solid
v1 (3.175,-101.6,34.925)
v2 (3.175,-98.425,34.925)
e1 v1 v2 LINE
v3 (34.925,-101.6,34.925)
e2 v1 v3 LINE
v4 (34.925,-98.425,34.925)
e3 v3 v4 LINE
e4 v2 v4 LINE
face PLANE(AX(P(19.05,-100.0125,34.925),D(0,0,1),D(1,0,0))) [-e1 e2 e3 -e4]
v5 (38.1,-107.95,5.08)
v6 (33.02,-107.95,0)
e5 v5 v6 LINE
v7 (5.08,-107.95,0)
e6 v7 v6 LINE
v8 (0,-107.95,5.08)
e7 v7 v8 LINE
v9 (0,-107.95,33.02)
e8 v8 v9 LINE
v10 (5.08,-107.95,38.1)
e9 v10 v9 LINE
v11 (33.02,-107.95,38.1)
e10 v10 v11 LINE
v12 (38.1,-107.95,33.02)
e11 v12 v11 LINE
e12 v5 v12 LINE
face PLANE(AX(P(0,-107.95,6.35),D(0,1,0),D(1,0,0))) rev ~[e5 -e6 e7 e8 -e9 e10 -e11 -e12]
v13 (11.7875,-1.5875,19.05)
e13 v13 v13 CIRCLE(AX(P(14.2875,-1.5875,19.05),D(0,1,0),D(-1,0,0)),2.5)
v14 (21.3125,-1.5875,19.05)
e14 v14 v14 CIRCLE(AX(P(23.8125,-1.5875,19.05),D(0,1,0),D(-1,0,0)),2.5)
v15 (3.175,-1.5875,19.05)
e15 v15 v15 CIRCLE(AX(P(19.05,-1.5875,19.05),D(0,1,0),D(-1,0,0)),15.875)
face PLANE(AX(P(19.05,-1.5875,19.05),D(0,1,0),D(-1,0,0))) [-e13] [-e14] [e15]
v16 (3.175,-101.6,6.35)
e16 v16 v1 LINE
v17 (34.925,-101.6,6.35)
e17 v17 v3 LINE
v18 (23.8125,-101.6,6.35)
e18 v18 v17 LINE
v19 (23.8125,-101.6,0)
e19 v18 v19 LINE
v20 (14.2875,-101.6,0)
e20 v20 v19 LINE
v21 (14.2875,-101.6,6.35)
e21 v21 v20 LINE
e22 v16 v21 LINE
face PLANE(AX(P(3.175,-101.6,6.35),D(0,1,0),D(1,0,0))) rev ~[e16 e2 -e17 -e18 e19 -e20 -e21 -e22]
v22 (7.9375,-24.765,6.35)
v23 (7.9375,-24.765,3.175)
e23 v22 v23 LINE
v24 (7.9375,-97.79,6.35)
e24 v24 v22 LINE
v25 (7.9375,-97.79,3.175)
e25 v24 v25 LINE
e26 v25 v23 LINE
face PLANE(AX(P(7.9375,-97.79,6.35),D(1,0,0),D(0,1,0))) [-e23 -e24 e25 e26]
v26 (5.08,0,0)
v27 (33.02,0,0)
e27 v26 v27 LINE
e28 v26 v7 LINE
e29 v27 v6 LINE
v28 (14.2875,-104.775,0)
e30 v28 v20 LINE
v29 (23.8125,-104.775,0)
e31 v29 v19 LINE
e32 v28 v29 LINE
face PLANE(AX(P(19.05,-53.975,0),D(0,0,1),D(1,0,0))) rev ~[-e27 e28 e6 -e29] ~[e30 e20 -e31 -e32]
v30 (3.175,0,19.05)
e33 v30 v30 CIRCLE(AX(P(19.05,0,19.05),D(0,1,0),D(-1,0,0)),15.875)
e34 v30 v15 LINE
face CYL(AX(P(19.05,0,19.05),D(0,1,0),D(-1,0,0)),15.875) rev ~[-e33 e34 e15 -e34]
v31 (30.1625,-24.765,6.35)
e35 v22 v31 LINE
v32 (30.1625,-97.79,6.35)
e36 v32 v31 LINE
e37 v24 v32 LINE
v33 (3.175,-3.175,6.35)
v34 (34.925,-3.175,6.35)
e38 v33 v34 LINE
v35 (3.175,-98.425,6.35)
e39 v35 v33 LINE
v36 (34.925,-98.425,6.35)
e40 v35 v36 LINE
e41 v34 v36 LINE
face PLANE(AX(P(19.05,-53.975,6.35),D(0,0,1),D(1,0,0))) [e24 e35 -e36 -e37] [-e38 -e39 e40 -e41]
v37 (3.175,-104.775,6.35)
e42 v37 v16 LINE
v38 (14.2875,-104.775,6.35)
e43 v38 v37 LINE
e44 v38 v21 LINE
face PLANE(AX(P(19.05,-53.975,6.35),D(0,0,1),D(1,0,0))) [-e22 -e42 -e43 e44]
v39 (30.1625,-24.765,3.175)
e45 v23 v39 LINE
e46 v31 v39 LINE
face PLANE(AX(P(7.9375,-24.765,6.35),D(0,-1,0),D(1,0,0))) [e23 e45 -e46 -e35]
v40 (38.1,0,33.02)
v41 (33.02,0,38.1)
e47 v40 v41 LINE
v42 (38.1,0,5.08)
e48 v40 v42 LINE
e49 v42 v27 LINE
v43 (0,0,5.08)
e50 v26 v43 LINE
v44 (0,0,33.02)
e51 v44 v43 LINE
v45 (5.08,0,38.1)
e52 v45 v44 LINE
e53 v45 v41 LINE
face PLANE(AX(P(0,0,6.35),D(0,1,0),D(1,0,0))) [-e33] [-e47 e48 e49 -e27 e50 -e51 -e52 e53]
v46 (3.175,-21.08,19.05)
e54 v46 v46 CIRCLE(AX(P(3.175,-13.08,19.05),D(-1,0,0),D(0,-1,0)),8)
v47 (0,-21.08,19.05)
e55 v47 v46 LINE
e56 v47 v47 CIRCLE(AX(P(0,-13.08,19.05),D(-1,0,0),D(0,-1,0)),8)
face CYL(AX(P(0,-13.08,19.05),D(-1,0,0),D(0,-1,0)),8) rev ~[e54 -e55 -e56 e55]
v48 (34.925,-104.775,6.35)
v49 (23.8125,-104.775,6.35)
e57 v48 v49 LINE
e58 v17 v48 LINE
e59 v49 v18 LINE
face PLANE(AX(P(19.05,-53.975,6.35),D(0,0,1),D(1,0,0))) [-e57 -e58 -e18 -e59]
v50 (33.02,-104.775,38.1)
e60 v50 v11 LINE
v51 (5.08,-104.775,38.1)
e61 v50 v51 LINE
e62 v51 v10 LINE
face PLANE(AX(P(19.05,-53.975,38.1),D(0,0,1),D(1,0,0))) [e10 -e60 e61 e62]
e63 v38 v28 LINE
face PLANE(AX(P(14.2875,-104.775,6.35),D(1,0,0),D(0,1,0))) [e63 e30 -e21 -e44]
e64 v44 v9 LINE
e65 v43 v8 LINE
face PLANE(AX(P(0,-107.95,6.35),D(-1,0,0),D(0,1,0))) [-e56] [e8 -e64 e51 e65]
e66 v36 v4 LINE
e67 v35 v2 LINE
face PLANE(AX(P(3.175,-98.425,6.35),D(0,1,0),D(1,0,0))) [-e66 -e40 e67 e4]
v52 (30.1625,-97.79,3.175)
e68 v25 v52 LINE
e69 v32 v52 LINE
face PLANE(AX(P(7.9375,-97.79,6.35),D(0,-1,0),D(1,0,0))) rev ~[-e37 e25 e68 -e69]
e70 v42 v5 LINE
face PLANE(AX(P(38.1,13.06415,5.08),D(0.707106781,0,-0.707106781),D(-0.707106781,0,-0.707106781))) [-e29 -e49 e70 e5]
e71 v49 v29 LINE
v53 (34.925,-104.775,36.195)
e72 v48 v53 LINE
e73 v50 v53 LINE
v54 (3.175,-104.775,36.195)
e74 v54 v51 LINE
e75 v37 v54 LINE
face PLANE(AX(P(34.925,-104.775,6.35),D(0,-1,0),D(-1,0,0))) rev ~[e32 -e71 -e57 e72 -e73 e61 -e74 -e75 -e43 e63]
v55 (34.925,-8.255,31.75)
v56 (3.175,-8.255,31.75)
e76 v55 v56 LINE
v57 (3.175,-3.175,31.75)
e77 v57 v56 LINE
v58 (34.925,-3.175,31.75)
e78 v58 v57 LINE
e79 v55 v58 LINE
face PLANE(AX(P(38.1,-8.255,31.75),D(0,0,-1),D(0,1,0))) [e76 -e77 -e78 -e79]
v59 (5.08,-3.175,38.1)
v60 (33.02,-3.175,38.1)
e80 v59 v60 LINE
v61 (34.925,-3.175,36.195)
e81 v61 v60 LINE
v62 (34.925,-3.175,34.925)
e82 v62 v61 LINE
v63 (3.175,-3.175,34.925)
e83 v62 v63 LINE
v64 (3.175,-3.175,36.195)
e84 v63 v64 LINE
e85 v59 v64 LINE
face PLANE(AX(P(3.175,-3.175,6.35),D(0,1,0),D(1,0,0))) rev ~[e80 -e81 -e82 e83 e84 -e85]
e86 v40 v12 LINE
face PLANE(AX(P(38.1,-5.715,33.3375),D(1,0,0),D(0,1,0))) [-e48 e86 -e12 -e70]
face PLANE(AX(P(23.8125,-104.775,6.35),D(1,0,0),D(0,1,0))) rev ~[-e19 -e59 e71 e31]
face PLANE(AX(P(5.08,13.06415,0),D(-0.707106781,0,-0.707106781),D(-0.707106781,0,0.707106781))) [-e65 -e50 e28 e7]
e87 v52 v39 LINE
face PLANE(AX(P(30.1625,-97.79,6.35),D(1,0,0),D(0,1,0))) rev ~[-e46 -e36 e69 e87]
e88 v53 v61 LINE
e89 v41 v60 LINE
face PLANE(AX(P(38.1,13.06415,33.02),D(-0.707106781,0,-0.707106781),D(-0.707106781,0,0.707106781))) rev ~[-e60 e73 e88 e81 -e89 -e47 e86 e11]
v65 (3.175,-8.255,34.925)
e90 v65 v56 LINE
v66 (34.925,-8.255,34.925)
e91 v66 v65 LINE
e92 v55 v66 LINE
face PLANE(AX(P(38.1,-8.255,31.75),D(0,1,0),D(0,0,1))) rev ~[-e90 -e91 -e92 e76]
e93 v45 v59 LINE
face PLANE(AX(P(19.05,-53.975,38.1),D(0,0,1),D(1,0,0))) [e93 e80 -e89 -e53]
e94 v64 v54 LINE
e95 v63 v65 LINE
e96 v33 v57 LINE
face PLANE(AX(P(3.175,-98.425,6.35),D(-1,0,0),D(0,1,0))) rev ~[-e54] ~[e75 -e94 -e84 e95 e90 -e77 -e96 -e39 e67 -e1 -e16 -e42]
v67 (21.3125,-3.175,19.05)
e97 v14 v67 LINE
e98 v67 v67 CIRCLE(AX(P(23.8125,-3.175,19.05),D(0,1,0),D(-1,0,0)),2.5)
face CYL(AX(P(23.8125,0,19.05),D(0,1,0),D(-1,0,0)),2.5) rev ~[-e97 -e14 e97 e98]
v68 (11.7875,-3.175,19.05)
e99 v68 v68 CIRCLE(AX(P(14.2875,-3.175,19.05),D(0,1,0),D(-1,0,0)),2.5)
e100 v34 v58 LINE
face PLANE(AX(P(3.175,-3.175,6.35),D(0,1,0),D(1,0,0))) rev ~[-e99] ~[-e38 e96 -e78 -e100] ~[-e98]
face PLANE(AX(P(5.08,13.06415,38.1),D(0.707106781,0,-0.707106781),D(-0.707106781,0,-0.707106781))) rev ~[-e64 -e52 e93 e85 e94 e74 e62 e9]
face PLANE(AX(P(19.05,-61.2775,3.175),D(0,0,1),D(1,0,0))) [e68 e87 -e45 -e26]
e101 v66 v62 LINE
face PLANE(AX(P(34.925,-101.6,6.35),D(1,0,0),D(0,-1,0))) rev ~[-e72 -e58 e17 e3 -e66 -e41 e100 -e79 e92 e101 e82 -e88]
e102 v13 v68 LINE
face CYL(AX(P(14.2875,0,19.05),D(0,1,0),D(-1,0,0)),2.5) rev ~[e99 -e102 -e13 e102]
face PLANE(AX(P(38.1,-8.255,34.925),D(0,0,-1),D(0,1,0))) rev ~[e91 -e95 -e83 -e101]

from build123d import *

# Parameters (mm, degrees)
F0_W         = 38.1
F0_H         = 107.95
F1_DEPTH     = 6.35
F2_W         = 22.225
F2_H         = 73.025
F3_DEPTH     = 3.175
F4_W         = 38.1
F4_H         = 107.95
F4_W_2       = 31.75
F4_H_2       = 3.175
F5_DEPTH     = 31.75
F6_R         = 15.875
F6_R_2       = 2.5
F7_DEPTH     = 1.5875
F8_R         = 2.5
F9_DEPTH     = 25.4
F10_R        = 8
F11_DEPTH    = 25.4
F12_W        = 9.525
F12_H        = 3.175
F13_DEPTH    = 25.4
F14_W        = 31.75
F14_H        = 3.175
F15_DEPTH    = 3.175
F16_W        = 5.08
F16_H        = 3.175
F17_DEPTH    = 38.1
F18_T1_DEPTH = 134.0782991577


# Not quite as in the source:
# - a fillet or chamfer that OpenCascade refuses, or shapes differently, is made with other operations: its cross-section is extruded or revolved along the edge and cut away or added


with BuildPart() as f1:
    # F0 (on Top) → F1 (new body)
    with BuildSketch(Plane.XY):
        with Locations((19.05, -53.975)):
            Rectangle(F0_W, F0_H)
    extrude(amount=F1_DEPTH)

    # F2 (on face) → F3 (cut)
    with BuildSketch(Plane.XY.offset(6.35)):
        with Locations((19.05, -61.2775)):
            Rectangle(F2_W, F2_H)
    extrude(amount=-F3_DEPTH, mode=Mode.SUBTRACT)

    # F4 (on face) → F5 (join)
    with BuildSketch(Plane.XY.offset(6.35)):
        with Locations((19.05, -53.975)):
            Rectangle(F4_W, F4_H)
        Polygon((3.175, -98.425), (3.175, -3.175), (34.925, -3.175), (34.925, -98.425), (34.925, -101.6), (34.925, -104.775), (3.175, -104.775), (3.175, -101.6), align=None, mode=Mode.SUBTRACT)
        with Locations((19.05, -100.0125)):
            Rectangle(F4_W_2, F4_H_2)
    extrude(amount=F5_DEPTH)

    # F6 (on face) → F7 (cut)
    with BuildSketch(Plane(origin=(0, 0, 0), x_dir=(-1, 0, 0), z_dir=(0, 1, 0))):
        with Locations((-19.05, 19.05)):
            Circle(F6_R)
        with Locations((-23.8125, 19.05)):
            Circle(F6_R_2, mode=Mode.SUBTRACT)
        with Locations((-14.2875, 19.05)):
            Circle(F6_R_2, mode=Mode.SUBTRACT)
    extrude(amount=-F7_DEPTH, mode=Mode.SUBTRACT)

    # F8 (on face) → F9 (cut)
    with BuildSketch(Plane(origin=(0, 0, 0), x_dir=(-1, 0, 0), z_dir=(0, 1, 0))):
        with Locations((-14.2875, 19.05)):
            Circle(F8_R)
        with Locations((-23.8125, 19.05)):
            Circle(F8_R)
    extrude(amount=-F9_DEPTH, mode=Mode.SUBTRACT)

    # F10 (on face) → F11 (cut)
    with BuildSketch(Plane(origin=(0, 0, 0), x_dir=(0, -1, 0), z_dir=(-1, 0, 0))):
        with Locations((13.08, 19.05)):
            Circle(F10_R)
    extrude(amount=-F11_DEPTH, mode=Mode.SUBTRACT)

    # F12 (on face) → F13 (cut)
    with BuildSketch(Plane.XY.offset(6.35)):
        with Locations((19.05, -103.1875)):
            Rectangle(F12_W, F12_H)
    extrude(amount=-F13_DEPTH, mode=Mode.SUBTRACT)

    # F14 (on face) → F15 (cut)
    with BuildSketch(Plane.XY.offset(38.1)):
        with Locations((19.05, -100.0125)):
            Rectangle(F14_W, F14_H)
    extrude(amount=-F15_DEPTH, mode=Mode.SUBTRACT)

    # F16 (on face) → F17 (join)
    with BuildSketch(Plane.YZ.offset(38.1)):
        with Locations((-5.715, 33.3375)):
            Rectangle(F16_W, F16_H)
    extrude(amount=-F17_DEPTH)

    # F18: chamfer of 5.08 on 4 edges, made by hand

    # F18_s2 → F18_t1 (cut)
    with BuildSketch(Plane.XZ.offset(-13.0641495789)):
        Polygon((38.1, 5.08), (33.02, 0), (38.1, 0), align=None)
        Polygon((38.1, 33.02), (33.02, 38.1), (38.1, 38.1), align=None)
        Polygon((5.08, 38.1), (0, 33.02), (0, 38.1), align=None)
        Polygon((5.08, 0), (0, 5.08), (0, 0), align=None)
    extrude(amount=F18_T1_DEPTH, mode=Mode.SUBTRACT)


solid = f1.part
